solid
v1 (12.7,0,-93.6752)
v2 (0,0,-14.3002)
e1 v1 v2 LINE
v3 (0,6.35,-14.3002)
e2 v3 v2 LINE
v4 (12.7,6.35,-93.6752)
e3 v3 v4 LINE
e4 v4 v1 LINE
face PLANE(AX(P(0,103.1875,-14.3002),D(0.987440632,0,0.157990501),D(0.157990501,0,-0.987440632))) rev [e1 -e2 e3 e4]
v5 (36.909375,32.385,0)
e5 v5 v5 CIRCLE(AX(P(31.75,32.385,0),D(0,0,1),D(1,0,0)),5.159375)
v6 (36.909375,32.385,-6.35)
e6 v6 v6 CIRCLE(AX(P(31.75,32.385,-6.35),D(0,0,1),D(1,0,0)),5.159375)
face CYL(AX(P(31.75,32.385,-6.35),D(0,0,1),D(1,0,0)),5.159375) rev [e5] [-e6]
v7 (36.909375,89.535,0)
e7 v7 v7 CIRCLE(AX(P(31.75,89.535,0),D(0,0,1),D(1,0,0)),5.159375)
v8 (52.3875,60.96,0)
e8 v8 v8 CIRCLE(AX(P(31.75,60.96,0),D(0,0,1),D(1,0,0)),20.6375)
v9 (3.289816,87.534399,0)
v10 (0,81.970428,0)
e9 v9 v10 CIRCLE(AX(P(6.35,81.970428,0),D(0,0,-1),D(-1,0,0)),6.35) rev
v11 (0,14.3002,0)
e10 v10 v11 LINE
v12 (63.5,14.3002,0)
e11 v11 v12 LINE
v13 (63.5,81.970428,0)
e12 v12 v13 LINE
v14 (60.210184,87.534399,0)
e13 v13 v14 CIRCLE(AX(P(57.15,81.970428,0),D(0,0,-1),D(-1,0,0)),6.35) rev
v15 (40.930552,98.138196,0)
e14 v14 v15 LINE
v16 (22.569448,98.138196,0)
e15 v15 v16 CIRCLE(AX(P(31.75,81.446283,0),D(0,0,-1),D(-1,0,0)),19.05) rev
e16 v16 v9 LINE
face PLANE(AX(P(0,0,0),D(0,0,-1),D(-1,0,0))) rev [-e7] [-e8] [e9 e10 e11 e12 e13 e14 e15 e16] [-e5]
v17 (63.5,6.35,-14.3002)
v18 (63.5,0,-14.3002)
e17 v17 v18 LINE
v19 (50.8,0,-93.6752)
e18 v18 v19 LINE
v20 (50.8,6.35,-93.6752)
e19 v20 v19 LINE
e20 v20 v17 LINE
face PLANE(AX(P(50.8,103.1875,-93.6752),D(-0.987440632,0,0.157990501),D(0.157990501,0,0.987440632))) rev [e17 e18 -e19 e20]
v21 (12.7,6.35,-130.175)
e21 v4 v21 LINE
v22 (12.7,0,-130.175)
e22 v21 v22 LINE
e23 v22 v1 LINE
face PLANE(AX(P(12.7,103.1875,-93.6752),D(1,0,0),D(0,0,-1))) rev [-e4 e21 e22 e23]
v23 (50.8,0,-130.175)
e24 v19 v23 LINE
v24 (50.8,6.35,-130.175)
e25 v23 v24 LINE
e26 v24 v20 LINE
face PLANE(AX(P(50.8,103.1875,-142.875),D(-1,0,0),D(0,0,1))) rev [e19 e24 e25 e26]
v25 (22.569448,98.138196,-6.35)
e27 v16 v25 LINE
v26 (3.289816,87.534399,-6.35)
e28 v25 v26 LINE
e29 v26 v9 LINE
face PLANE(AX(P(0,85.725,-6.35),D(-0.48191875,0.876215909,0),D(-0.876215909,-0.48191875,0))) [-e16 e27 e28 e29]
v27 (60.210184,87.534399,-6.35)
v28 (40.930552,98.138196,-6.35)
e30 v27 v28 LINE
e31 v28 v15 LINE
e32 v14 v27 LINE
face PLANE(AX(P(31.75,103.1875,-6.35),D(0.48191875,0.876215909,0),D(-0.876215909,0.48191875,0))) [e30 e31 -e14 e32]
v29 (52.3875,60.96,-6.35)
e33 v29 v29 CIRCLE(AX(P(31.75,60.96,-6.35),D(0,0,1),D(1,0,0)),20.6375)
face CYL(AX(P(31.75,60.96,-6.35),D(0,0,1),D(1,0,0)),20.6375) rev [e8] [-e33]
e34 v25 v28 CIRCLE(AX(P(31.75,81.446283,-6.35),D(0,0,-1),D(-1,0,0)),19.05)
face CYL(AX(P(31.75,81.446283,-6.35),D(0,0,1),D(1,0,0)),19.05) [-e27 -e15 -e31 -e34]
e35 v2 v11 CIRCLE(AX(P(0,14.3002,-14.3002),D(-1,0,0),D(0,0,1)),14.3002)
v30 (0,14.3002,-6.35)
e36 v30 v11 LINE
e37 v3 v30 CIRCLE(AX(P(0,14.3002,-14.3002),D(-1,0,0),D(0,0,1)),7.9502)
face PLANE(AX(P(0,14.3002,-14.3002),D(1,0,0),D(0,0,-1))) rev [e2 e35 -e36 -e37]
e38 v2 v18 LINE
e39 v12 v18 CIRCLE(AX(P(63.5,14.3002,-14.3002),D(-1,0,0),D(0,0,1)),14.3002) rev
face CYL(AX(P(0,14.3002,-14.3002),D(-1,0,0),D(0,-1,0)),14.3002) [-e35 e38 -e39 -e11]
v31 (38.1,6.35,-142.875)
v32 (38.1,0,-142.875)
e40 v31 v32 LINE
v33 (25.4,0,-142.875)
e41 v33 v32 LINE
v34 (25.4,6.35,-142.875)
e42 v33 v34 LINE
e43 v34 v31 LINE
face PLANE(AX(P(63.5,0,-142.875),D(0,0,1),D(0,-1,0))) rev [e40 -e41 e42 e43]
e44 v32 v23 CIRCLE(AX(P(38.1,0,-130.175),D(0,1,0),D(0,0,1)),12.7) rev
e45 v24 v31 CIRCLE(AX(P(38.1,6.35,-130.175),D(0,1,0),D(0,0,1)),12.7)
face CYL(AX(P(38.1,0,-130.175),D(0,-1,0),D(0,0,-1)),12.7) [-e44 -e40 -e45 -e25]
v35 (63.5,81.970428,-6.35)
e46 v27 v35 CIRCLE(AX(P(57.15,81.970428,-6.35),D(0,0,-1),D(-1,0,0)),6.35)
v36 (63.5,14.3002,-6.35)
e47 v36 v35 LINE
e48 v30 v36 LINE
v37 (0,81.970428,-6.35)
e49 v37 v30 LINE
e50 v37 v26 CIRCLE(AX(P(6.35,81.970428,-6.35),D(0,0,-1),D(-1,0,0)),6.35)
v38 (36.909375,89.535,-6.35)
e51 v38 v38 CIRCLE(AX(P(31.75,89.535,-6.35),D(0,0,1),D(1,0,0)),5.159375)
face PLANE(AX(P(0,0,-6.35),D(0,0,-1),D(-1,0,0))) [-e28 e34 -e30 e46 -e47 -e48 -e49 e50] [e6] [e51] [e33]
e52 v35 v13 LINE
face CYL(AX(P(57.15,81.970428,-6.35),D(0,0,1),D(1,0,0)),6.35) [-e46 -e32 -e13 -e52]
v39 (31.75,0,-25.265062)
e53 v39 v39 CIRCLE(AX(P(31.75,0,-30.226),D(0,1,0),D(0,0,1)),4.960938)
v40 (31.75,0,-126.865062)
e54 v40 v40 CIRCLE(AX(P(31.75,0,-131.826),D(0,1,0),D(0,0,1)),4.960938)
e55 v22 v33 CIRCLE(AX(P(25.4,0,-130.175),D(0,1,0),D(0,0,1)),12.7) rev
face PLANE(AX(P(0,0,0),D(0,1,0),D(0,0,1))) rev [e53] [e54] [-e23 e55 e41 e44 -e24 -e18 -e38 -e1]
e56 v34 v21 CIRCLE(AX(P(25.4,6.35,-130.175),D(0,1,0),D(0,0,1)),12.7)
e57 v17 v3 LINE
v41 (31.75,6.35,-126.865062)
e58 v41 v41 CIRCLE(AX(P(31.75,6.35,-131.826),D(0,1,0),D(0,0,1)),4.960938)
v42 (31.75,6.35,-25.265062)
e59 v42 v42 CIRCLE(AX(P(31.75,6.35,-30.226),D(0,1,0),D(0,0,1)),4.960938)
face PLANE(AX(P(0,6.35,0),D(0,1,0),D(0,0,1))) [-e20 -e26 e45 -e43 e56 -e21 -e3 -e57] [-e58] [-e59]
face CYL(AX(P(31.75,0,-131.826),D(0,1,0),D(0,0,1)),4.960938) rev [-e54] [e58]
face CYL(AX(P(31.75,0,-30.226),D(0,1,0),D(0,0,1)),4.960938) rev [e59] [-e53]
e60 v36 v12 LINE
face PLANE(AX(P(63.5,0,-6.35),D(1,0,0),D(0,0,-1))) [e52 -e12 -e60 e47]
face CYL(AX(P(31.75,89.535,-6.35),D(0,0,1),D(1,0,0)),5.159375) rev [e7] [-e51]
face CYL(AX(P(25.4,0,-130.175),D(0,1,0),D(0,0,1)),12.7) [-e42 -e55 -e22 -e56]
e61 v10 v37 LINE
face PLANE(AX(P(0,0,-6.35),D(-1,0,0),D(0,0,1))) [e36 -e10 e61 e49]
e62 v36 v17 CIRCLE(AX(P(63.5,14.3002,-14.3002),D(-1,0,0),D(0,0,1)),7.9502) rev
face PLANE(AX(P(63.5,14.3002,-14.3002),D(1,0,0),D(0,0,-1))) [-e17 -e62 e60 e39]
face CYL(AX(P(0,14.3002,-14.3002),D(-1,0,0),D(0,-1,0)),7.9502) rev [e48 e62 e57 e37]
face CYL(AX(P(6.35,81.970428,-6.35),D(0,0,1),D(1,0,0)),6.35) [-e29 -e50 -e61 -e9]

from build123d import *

# Parameters (mm, degrees)
SKETCH1_R                    = 20.6375
SKETCH1_R_2                  = 5.159375
BASE_FLANGE1_DEPTH           = 6.35
EDGE_FLANGE1_STRIP_W         = 41.3004
EDGE_FLANGE1_STRIP_H         = 6.35
EDGE_FLANGE1_STRIP_CUT_DEPTH = 63.5
EDGE_FLANGE1_DEPTH           = 63.5
SKETCH9_R                    = 4.9609375
CUT_EXTRUDE1_DEPTH           = 184.910350528
CUT_EXTRUDE2_DEPTH           = 188.331726574
FILLET1_R                    = 19.05
FILLET2_R                    = 6.35
FILLET3_R                    = 12.7


# Sheet-metal steps are written as plain solids
with BuildPart() as part:
    # Sketch1 → Base-Flange1 (new body)
    with BuildSketch(Plane.XY):
        Polygon((0, 85.725), (31.75, 103.1875), (63.5, 85.725), (63.5, 0), (0, 0), align=None)
        with Locations((31.75, 60.96)):
            Circle(SKETCH1_R, mode=Mode.SUBTRACT)
        with Locations((31.75, 89.535)):
            Circle(SKETCH1_R_2, mode=Mode.SUBTRACT)
        with Locations((31.75, 32.385)):
            Circle(SKETCH1_R_2, mode=Mode.SUBTRACT)
    extrude(amount=-BASE_FLANGE1_DEPTH)

    # Edge-Flange1 strip (across the edge) → Edge-Flange1 strip cut (cut)
    with BuildSketch(Plane(origin=(63.5, 0, -6.35), x_dir=(0, 1, 0), z_dir=(-1, 0, 0))):
        with Locations((-6.35, -3.175)):
            Rectangle(EDGE_FLANGE1_STRIP_W, EDGE_FLANGE1_STRIP_H)
    extrude(amount=EDGE_FLANGE1_STRIP_CUT_DEPTH, mode=Mode.SUBTRACT)

    # Edge-Flange1 section (across the edge) → Edge-Flange1 (add)
    with BuildSketch(Plane(origin=(63.5, 0, -6.35), x_dir=(0, 1, 0), z_dir=(-1, 0, 0))):
        with BuildLine():
            Line((0, 7.9502), (0, 136.525))
            Line((0, 136.525), (6.35, 136.525))
            Line((6.35, 136.525), (6.35, 7.9502))
            ThreePointArc((6.35, 7.9502), (8.678559668, 2.328559668), (14.3002, 0))
            Line((14.3002, 0), (14.3002, -6.35))
            ThreePointArc((14.3002, -6.35), (4.188431608, -2.161568392), (0, 7.9502))
        make_face()
    extrude(amount=EDGE_FLANGE1_DEPTH)

    # Sketch9 → Cut-Extrude1 (cut, through all)
    with BuildSketch(Plane(origin=(0, 6.35, 0), x_dir=(1, 0, 0), z_dir=(0, 1, 0))):
        with Locations(Location((31.75, 30.226, 0), (0, 0, 270))):
            Circle(SKETCH9_R)
        with Locations(Location((31.75, 131.826, 0), (0, 0, 270))):
            Circle(SKETCH9_R)
    extrude(amount=-CUT_EXTRUDE1_DEPTH, mode=Mode.SUBTRACT)

    # Sketch10 → Cut-Extrude2 (cut, through all)
    with BuildSketch(Plane.XZ):
        Polygon((0, -142.875), (12.7, -142.875), (12.7, -93.6752), (0, -14.3002), align=None)
        Polygon((63.5, -142.875), (63.5, -14.3002), (50.8, -93.6752), (50.8, -142.875), align=None)
    extrude(amount=-CUT_EXTRUDE2_DEPTH, mode=Mode.SUBTRACT)

    # Fillet1
    fillet1_edges = [part.edges().sort_by_distance(p)[0] for p in [
        (31.75, 103.1875, -3.175),
    ]]
    fillet(fillet1_edges, radius=FILLET1_R)

    # Fillet2
    fillet2_edges = [part.edges().sort_by_distance(p)[0] for p in [
        (0, 85.725, -3.175),
        (63.5, 85.725, -3.175),
    ]]
    fillet(fillet2_edges, radius=FILLET2_R)

    # Fillet3
    fillet3_edges = [part.edges().sort_by_distance(p)[0] for p in [
        (50.8, 3.175, -142.875),
        (12.7, 3.175, -142.875),
    ]]
    fillet(fillet3_edges, radius=FILLET3_R)


solid = part.part
